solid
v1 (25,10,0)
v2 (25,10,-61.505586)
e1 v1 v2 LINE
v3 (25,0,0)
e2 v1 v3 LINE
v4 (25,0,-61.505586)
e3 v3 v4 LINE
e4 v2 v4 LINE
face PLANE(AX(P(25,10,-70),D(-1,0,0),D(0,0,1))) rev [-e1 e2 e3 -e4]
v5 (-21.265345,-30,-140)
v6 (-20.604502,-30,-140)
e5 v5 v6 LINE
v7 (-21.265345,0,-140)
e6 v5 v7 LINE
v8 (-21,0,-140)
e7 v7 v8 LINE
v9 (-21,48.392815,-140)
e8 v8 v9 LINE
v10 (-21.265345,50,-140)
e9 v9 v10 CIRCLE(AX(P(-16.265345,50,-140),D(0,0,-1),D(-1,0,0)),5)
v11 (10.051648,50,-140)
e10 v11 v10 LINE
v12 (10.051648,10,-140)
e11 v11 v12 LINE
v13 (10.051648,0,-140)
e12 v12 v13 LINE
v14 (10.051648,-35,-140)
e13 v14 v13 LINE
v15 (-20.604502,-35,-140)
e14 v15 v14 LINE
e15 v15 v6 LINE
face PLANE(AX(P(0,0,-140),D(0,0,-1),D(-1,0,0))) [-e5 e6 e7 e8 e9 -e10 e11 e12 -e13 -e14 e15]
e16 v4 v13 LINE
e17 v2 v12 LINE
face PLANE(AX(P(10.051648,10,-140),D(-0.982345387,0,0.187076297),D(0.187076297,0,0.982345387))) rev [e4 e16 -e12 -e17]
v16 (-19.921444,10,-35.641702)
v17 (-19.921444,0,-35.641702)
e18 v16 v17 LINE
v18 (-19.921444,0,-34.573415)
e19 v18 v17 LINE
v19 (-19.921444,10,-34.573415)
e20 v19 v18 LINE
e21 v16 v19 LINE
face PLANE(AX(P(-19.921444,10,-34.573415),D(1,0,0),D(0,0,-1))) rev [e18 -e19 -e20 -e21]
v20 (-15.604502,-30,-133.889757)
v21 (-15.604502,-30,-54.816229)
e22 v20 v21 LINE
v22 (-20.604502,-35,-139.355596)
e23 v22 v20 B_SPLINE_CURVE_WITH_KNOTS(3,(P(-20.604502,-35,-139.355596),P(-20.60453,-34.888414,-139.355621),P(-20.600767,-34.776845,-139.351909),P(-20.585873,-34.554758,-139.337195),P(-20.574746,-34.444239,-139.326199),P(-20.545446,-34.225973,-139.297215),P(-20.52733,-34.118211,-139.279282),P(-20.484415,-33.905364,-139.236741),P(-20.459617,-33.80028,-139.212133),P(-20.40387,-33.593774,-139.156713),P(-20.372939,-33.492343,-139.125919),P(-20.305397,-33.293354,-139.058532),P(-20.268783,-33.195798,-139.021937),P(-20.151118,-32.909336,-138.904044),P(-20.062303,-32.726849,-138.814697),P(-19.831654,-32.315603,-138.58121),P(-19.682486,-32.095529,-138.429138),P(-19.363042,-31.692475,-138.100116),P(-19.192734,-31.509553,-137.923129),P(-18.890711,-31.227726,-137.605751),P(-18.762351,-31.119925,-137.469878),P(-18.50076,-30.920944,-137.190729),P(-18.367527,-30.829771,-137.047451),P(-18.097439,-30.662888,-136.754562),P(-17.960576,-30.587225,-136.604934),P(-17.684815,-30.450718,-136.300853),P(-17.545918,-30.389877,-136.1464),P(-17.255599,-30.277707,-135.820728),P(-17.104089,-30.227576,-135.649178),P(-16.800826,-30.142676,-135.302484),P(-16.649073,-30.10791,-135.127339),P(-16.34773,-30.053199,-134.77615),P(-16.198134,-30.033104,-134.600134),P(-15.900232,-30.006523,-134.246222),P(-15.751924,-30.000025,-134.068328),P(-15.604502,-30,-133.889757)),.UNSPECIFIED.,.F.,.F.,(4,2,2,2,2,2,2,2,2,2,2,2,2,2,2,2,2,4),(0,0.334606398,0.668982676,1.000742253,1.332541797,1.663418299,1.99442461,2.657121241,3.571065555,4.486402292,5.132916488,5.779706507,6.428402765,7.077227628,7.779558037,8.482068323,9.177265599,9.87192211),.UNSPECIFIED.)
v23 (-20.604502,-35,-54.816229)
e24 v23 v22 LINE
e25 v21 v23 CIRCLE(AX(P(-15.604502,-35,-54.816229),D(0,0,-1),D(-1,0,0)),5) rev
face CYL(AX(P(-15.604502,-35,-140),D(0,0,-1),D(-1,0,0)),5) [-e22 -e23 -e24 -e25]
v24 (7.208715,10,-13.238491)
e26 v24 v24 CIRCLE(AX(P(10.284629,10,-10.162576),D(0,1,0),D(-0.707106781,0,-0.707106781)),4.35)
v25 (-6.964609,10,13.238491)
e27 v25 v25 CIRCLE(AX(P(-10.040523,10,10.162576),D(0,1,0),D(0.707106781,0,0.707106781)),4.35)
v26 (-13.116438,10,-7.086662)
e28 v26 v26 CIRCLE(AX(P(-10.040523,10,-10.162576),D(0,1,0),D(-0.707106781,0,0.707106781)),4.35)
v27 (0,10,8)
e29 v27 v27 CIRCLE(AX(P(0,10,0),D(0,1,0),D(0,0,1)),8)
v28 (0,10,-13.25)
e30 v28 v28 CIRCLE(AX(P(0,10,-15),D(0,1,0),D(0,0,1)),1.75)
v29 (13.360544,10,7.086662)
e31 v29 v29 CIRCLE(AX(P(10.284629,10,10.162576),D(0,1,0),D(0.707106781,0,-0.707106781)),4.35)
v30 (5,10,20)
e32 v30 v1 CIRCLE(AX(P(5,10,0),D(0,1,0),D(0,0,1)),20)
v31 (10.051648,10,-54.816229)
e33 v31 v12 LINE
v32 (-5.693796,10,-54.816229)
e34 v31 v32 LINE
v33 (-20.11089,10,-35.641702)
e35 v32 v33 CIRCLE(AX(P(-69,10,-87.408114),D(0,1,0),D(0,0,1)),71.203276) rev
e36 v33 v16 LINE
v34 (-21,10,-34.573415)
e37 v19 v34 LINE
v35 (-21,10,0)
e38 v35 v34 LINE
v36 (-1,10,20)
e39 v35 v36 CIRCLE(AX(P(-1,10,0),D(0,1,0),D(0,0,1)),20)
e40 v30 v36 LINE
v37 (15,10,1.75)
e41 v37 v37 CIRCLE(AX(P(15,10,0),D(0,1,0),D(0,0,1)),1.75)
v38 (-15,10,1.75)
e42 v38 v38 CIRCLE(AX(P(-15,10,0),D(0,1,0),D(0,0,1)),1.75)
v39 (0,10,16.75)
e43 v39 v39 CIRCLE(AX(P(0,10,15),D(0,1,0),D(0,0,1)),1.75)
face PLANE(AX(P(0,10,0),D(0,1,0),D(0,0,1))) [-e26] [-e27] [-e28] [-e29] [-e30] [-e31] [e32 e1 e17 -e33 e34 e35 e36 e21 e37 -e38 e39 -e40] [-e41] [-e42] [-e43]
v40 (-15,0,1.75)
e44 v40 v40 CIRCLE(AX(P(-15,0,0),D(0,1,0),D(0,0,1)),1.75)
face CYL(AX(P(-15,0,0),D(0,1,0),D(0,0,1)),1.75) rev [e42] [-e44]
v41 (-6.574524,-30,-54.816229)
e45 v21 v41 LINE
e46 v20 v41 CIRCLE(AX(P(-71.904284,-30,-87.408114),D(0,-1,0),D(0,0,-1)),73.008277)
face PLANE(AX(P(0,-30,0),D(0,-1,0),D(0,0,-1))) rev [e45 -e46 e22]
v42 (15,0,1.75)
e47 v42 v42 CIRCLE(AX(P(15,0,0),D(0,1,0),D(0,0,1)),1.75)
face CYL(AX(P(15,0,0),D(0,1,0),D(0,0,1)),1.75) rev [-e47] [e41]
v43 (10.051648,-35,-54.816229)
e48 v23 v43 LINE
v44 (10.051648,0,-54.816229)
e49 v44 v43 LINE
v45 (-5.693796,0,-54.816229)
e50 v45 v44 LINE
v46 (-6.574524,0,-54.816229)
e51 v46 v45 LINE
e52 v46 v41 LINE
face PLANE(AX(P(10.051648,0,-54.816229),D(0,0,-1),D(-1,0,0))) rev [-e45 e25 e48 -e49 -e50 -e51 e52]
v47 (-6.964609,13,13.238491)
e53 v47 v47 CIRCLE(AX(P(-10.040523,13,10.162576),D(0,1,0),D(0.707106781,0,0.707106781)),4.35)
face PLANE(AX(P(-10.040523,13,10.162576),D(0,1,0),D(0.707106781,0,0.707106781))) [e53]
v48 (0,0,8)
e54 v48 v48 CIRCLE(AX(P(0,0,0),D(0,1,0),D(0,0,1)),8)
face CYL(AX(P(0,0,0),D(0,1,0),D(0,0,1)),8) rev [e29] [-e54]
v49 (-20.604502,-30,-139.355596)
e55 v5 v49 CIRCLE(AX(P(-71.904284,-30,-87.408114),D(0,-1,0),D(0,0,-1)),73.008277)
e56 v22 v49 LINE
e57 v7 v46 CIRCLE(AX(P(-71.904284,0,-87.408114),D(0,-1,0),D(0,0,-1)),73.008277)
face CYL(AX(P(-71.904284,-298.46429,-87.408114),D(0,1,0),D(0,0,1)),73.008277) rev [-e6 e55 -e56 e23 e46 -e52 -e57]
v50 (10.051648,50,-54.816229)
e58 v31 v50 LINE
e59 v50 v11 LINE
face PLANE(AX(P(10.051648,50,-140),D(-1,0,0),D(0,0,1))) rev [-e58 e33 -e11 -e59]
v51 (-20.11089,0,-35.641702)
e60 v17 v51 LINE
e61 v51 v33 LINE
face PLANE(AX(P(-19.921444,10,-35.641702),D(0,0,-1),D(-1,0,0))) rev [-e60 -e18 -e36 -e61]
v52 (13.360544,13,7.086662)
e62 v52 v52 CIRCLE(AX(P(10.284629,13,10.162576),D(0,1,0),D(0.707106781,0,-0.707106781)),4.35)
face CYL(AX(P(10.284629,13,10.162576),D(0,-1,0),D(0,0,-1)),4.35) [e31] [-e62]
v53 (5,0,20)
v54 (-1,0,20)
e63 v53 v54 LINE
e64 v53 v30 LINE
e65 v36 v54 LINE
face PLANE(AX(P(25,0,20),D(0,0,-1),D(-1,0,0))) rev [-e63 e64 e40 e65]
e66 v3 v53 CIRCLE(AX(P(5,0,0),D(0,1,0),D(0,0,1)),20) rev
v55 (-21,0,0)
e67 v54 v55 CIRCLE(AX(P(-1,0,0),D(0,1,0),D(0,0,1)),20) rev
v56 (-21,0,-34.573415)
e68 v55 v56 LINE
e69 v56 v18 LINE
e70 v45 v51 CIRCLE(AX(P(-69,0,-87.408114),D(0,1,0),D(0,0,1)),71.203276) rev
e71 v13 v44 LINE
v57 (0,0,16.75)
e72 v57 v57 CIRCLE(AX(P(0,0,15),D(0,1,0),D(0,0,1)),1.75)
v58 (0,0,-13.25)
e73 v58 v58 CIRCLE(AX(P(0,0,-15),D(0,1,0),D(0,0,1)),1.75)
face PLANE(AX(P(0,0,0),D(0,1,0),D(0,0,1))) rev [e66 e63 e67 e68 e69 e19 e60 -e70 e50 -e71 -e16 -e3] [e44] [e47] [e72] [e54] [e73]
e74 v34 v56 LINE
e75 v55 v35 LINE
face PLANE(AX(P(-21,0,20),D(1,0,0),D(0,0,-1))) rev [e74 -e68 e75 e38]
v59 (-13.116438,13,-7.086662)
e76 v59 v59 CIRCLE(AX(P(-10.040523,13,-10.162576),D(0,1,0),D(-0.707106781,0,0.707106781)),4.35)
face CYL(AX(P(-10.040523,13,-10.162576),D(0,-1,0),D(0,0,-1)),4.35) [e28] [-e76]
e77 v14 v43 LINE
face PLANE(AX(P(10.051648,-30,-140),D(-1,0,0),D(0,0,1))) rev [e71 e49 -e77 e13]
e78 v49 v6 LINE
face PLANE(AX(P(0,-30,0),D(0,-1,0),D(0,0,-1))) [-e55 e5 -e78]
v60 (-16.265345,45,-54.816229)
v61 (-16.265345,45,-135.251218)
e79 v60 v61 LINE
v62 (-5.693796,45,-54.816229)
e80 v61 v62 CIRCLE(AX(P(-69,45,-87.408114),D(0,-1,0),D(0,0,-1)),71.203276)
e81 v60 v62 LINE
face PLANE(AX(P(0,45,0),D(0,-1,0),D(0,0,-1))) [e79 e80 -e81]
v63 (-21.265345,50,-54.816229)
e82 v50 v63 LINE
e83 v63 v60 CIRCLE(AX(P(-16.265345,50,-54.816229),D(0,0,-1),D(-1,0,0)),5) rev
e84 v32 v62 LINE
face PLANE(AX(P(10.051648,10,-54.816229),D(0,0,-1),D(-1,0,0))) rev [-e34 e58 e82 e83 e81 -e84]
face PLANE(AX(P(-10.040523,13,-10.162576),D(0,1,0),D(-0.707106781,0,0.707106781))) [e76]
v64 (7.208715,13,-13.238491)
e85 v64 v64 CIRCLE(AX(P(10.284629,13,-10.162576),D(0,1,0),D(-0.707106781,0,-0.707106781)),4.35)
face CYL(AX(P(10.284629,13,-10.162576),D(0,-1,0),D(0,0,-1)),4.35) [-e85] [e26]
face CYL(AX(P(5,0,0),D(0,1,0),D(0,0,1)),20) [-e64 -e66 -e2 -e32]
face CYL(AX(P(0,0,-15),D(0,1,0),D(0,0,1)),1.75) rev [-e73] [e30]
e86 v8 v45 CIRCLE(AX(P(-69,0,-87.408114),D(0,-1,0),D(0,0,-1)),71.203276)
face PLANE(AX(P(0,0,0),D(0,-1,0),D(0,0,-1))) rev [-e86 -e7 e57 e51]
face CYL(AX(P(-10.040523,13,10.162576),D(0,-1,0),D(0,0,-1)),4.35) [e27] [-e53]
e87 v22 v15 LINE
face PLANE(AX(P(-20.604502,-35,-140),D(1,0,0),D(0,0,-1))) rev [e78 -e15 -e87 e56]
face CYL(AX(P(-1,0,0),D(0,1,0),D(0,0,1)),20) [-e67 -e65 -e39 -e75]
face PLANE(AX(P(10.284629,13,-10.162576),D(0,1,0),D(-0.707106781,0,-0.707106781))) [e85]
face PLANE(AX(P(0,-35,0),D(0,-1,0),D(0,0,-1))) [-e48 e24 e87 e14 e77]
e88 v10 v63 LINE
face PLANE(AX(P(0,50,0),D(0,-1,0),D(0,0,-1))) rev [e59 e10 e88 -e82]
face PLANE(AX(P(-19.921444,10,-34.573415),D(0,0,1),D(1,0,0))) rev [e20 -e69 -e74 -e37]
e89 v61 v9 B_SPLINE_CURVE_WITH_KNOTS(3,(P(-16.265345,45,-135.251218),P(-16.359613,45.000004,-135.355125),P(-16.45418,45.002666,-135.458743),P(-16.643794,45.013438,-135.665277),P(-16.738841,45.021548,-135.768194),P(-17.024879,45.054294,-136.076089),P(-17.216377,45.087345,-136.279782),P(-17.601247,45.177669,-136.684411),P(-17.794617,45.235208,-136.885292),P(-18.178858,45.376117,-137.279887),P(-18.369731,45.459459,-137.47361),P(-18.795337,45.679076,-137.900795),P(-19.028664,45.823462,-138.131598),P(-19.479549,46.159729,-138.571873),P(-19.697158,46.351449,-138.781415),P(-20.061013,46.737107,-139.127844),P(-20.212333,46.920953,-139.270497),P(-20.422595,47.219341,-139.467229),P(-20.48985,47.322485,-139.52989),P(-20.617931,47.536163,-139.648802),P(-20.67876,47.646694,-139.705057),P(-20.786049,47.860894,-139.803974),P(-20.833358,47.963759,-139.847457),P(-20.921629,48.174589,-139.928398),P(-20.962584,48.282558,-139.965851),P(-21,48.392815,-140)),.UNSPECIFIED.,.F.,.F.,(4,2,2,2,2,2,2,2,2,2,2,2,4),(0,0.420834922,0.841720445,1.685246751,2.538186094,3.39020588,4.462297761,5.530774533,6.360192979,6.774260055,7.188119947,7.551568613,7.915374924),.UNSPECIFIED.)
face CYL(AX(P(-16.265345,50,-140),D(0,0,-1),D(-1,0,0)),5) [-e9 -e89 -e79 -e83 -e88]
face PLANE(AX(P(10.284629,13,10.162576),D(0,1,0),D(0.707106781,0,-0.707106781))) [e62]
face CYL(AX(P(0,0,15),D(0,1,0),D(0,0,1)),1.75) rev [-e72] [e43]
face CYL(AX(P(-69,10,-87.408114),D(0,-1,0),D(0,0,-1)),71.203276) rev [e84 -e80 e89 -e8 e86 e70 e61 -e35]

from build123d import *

# Parameters (mm, degrees)
SKETCH1_W                = 50
SKETCH1_H                = 140
BOSS_EXTRUDE1_DEPTH      = 10
SKETCH2_R                = 4.35
BOSS_EXTRUDE2_DEPTH      = 3
CIRPATTERN2_COUNT        = 8
SKETCH4_R                = 4.575
CUT_EXTRUDE3_DEPTH       = 3
SKETCH5_W                = 50
SKETCH5_H                = 10
BOSS_EXTRUDE3_DEPTH      = 70
SKETCH6_W                = 50
SKETCH6_H                = 50
CUT_EXTRUDE4_DEPTH       = 10
SKETCH7_R                = 1.75
CUT_EXTRUDE5_DEPTH       = 10
SKETCH8_W                = 4
SKETCH8_H                = 160
CUT_EXTRUDE6_DEPTH       = 10
CUT_EXTRUDE10_DEPTH      = 10
CUT_EXTRUDE9_DEPTH       = 10
SKETCH11_W               = 31.31699353
SKETCH11_H               = 105.183771494
BOSS_EXTRUDE4_DEPTH      = 40
FILLET1_R                = 20
FILLET2_R                = 20
SKETCH16_R               = 8
CUT_EXTRUDE15_DEPTH      = 10
CUT_EXTRUDE17_DEPTH      = 148.732867027
CUT_EXTRUDE17_DEPTH_BACK = 35
SKETCH18_W               = 31.31699353
SKETCH18_H               = 105.183771494
BOSS_EXTRUDE6_DEPTH      = 30
CUT_EXTRUDE20_DEPTH      = 164.171688721
CUT_EXTRUDE20_DEPTH_BACK = 30
SKETCH22_W               = 30.656149889
SKETCH22_H               = 104.820059864
BOSS_EXTRUDE7_DEPTH      = 5
SKETCH23_W               = 31.31699353
SKETCH23_H               = 20
CUT_EXTRUDE21_DEPTH      = 40
SKETCH24_W               = 30.656149889
SKETCH24_H               = 20
CUT_EXTRUDE22_DEPTH      = 35
SKETCH25_W               = 1.83885533
SKETCH25_H               = 1.068287382
CUT_EXTRUDE23_DEPTH      = 40
FILLET3_R                = 5
FILLET4_R                = 5


with BuildPart() as part:
    # Sketch1 → Boss-Extrude1 (new body)
    with BuildSketch(Plane(origin=(0, 0, 0), x_dir=(1, 0, 0), z_dir=(0, 1, 0))):
        Rectangle(SKETCH1_W, SKETCH1_H)
    extrude(amount=BOSS_EXTRUDE1_DEPTH)

    # Sketch2 → Boss-Extrude2 (add)
    with BuildSketch(Plane(origin=(0, 10, 0), x_dir=(1, 0, 0), z_dir=(0, 1, 0))):
        with Locations(Location((-14.25, 0, 0), (0, 0, 270))):
            Circle(SKETCH2_R)
    boss_extrude2 = extrude(amount=BOSS_EXTRUDE2_DEPTH)

    # CirPattern2: Boss-Extrude2 ×8 about axis
    cirpattern2_axis = Axis((0.122053198, 0, 0), (0, 1, 0))
    for i in range(1, CIRPATTERN2_COUNT):
        add(boss_extrude2.rotate(cirpattern2_axis, i * 360 / CIRPATTERN2_COUNT))

    # Sketch4 → Cut-Extrude3 (cut)
    with BuildSketch(Plane(origin=(0, 13, 0), x_dir=(1, 0, 0), z_dir=(0, 1, 0))):
        with Locations((-14.25, 0)):
            Circle(SKETCH4_R)
        with Locations((14.494106396, 0)):
            Circle(SKETCH4_R)
        with Locations((0.122053198, -14.372053198)):
            Circle(SKETCH4_R)
        with Locations((0.122053198, 14.372053198)):
            Circle(SKETCH4_R)
    extrude(amount=-CUT_EXTRUDE3_DEPTH, mode=Mode.SUBTRACT)

    # Sketch5 → Boss-Extrude3 (add)
    with BuildSketch(Plane(origin=(0, 0, -70), x_dir=(-1, 0, 0), z_dir=(0, 0, -1))):
        with Locations((0, 5)):
            Rectangle(SKETCH5_W, SKETCH5_H)
    extrude(amount=BOSS_EXTRUDE3_DEPTH)

    # Sketch6 → Cut-Extrude4 (cut)
    with BuildSketch(Plane(origin=(0, 10, 0), x_dir=(1, 0, 0), z_dir=(0, 1, 0))):
        with Locations((0, -45)):
            Rectangle(SKETCH6_W, SKETCH6_H)
    extrude(amount=-CUT_EXTRUDE4_DEPTH, mode=Mode.SUBTRACT)

    # Sketch7 → Cut-Extrude5 (cut)
    with BuildSketch(Plane(origin=(0, 10, 0), x_dir=(1, 0, 0), z_dir=(0, 1, 0))):
        with Locations(Location((15, 0, 0), (0, 0, 270))):
            Circle(SKETCH7_R)
        with Locations(Location((-15, 0, 0), (0, 0, 270))):
            Circle(SKETCH7_R)
        with Locations(Location((0, 15, 0), (0, 0, 270))):
            Circle(SKETCH7_R)
        with Locations(Location((0, -15, 0), (0, 0, 270))):
            Circle(SKETCH7_R)
    extrude(amount=-CUT_EXTRUDE5_DEPTH, mode=Mode.SUBTRACT)

    # Sketch8 → Cut-Extrude6 (cut)
    with BuildSketch(Plane(origin=(0, 10, 0), x_dir=(1, 0, 0), z_dir=(0, 1, 0))):
        with Locations((-23, 60)):
            Rectangle(SKETCH8_W, SKETCH8_H)
    extrude(amount=-CUT_EXTRUDE6_DEPTH, mode=Mode.SUBTRACT)

    # Sketch9 → Cut-Extrude10 (cut)
    with BuildSketch(Plane(origin=(0, 0, 0), x_dir=(-1, 0, 0), z_dir=(0, -1, 0))):
        Polygon((-10.051648387, 140), (-25, 61.50558626), (-25, 140), align=None)
    extrude(amount=-CUT_EXTRUDE10_DEPTH, mode=Mode.SUBTRACT)

    # Sketch10 → Cut-Extrude9 (cut)
    with BuildSketch(Plane(origin=(0, 0, 0), x_dir=(-1, 0, 0), z_dir=(0, -1, 0))):
        with BuildLine():
            Line((21, 34.816228506), (21, 140))
            ThreePointArc((21, 140), (-2.203275532, 87.408114253), (21, 34.816228506))
        make_face()
    extrude(amount=-CUT_EXTRUDE9_DEPTH, mode=Mode.SUBTRACT)

    # Sketch11 → Boss-Extrude4 (add)
    with BuildSketch(Plane(origin=(0, 10, 0), x_dir=(1, 0, 0), z_dir=(0, 1, 0))):
        with Locations((-5.606848378, 87.408114253)):
            Rectangle(SKETCH11_W, SKETCH11_H)
    extrude(amount=BOSS_EXTRUDE4_DEPTH)

    # Fillet1
    fillet1_edges = [part.edges().sort_by_distance(p)[0] for p in [
        (25, 5, 20),
    ]]
    fillet(fillet1_edges, radius=FILLET1_R)

    # Fillet2
    fillet2_edges = [part.edges().sort_by_distance(p)[0] for p in [
        (-21, 5, 20),
    ]]
    fillet(fillet2_edges, radius=FILLET2_R)

    # Sketch16 → Cut-Extrude15 (cut)
    with BuildSketch(Plane(origin=(0, 10, 0), x_dir=(1, 0, 0), z_dir=(0, 1, 0))):
        with Locations(Location((0, 0, 0), (0, 0, 270))):
            Circle(SKETCH16_R)
    extrude(amount=-CUT_EXTRUDE15_DEPTH, mode=Mode.SUBTRACT)

    # Sketch17 → Cut-Extrude17 (cut, two sides: drawn at the far end of the back side and taken through both)
    with BuildSketch(Plane(origin=(0, 10, 0), x_dir=(-1, 0, 0), z_dir=(0, -1, 0)).offset(-CUT_EXTRUDE17_DEPTH_BACK)):
        with BuildLine():
            Line((274.317595229, 371.200011147), (21, 140))
            ThreePointArc((21, 140), (-2.203275532, 87.408114253), (21, 34.816228506))
            Line((21, 34.816228506), (274.317595229, -196.383782641))
            Line((274.317595229, -196.383782641), (960.242515922, -196.383782641))
            Line((960.242515922, -196.383782641), (960.242515922, 371.200011147))
            Line((960.242515922, 371.200011147), (274.317595229, 371.200011147))
        make_face()
    extrude(amount=CUT_EXTRUDE17_DEPTH + CUT_EXTRUDE17_DEPTH_BACK, mode=Mode.SUBTRACT)

    # Sketch18 → Boss-Extrude6 (add)
    with BuildSketch(Plane(origin=(0, 0, 0), x_dir=(-1, 0, 0), z_dir=(0, -1, 0))):
        with Locations((5.606848378, 87.408114253)):
            Rectangle(SKETCH18_W, SKETCH18_H)
    extrude(amount=BOSS_EXTRUDE6_DEPTH)

    # Sketch21 → Cut-Extrude20 (cut, two sides: drawn at the far end of the back side and taken through both)
    with BuildSketch(Plane(origin=(0, -30, 0), x_dir=(-1, 0, 0), z_dir=(0, -1, 0)).offset(-CUT_EXTRUDE20_DEPTH_BACK)):
        with BuildLine():
            Line((268.426015736, 377.982607024), (21.265345143, 140))
            ThreePointArc((21.265345143, 140), (-1.103993451, 87.408114253), (21.265345143, 34.816228506))
            Line((21.265345143, 34.816228506), (268.426015736, -203.166378519))
            Line((268.426015736, -203.166378519), (954.644984679, -203.166378519))
            Line((954.644984679, -203.166378519), (954.644984679, 377.982607024))
            Line((954.644984679, 377.982607024), (268.426015736, 377.982607024))
        make_face()
    extrude(amount=CUT_EXTRUDE20_DEPTH + CUT_EXTRUDE20_DEPTH_BACK, mode=Mode.SUBTRACT)

    # Sketch22 → Boss-Extrude7 (add)
    with BuildSketch(Plane(origin=(0, -30, 0), x_dir=(-1, 0, 0), z_dir=(0, -1, 0))):
        with Locations((5.276426558, 87.589970068)):
            Rectangle(SKETCH22_W, SKETCH22_H)
    extrude(amount=BOSS_EXTRUDE7_DEPTH)

    # Sketch23 → Cut-Extrude21 (cut)
    with BuildSketch(Plane(origin=(0, 50, 0), x_dir=(1, 0, 0), z_dir=(0, 1, 0))):
        with Locations((-5.606848378, 44.816228506)):
            Rectangle(SKETCH23_W, SKETCH23_H)
    extrude(amount=-CUT_EXTRUDE21_DEPTH, mode=Mode.SUBTRACT)

    # Sketch24 → Cut-Extrude22 (cut)
    with BuildSketch(Plane(origin=(0, -35, 0), x_dir=(-1, 0, 0), z_dir=(0, -1, 0))):
        with Locations((5.276426558, 44.816228506)):
            Rectangle(SKETCH24_W, SKETCH24_H)
    extrude(amount=-CUT_EXTRUDE22_DEPTH, mode=Mode.SUBTRACT)

    # Sketch25 → Cut-Extrude23 (cut)
    with BuildSketch(Plane(origin=(0, -30, 0), x_dir=(-1, 0, 0), z_dir=(0, -1, 0))):
        with Locations((20.840871232, 35.107558697)):
            Rectangle(SKETCH25_W, SKETCH25_H)
    extrude(amount=-CUT_EXTRUDE23_DEPTH, mode=Mode.SUBTRACT)

    # Fillet3
    fillet3_edges = [part.edges().sort_by_distance(p)[0] for p in [
        (-21.265345143, 45, -97.408114253),
    ]]
    fillet(fillet3_edges, radius=FILLET3_R - 0.0001)  # a hair under: the kernel refuses the full size

    # Fillet4
    fillet4_edges = [part.edges().sort_by_distance(p)[0] for p in [
        (-20.604501502, -30, -97.085912401),
    ]]
    fillet(fillet4_edges, radius=FILLET4_R - 0.0001)  # a hair under: the kernel refuses the full size


solid = part.part
